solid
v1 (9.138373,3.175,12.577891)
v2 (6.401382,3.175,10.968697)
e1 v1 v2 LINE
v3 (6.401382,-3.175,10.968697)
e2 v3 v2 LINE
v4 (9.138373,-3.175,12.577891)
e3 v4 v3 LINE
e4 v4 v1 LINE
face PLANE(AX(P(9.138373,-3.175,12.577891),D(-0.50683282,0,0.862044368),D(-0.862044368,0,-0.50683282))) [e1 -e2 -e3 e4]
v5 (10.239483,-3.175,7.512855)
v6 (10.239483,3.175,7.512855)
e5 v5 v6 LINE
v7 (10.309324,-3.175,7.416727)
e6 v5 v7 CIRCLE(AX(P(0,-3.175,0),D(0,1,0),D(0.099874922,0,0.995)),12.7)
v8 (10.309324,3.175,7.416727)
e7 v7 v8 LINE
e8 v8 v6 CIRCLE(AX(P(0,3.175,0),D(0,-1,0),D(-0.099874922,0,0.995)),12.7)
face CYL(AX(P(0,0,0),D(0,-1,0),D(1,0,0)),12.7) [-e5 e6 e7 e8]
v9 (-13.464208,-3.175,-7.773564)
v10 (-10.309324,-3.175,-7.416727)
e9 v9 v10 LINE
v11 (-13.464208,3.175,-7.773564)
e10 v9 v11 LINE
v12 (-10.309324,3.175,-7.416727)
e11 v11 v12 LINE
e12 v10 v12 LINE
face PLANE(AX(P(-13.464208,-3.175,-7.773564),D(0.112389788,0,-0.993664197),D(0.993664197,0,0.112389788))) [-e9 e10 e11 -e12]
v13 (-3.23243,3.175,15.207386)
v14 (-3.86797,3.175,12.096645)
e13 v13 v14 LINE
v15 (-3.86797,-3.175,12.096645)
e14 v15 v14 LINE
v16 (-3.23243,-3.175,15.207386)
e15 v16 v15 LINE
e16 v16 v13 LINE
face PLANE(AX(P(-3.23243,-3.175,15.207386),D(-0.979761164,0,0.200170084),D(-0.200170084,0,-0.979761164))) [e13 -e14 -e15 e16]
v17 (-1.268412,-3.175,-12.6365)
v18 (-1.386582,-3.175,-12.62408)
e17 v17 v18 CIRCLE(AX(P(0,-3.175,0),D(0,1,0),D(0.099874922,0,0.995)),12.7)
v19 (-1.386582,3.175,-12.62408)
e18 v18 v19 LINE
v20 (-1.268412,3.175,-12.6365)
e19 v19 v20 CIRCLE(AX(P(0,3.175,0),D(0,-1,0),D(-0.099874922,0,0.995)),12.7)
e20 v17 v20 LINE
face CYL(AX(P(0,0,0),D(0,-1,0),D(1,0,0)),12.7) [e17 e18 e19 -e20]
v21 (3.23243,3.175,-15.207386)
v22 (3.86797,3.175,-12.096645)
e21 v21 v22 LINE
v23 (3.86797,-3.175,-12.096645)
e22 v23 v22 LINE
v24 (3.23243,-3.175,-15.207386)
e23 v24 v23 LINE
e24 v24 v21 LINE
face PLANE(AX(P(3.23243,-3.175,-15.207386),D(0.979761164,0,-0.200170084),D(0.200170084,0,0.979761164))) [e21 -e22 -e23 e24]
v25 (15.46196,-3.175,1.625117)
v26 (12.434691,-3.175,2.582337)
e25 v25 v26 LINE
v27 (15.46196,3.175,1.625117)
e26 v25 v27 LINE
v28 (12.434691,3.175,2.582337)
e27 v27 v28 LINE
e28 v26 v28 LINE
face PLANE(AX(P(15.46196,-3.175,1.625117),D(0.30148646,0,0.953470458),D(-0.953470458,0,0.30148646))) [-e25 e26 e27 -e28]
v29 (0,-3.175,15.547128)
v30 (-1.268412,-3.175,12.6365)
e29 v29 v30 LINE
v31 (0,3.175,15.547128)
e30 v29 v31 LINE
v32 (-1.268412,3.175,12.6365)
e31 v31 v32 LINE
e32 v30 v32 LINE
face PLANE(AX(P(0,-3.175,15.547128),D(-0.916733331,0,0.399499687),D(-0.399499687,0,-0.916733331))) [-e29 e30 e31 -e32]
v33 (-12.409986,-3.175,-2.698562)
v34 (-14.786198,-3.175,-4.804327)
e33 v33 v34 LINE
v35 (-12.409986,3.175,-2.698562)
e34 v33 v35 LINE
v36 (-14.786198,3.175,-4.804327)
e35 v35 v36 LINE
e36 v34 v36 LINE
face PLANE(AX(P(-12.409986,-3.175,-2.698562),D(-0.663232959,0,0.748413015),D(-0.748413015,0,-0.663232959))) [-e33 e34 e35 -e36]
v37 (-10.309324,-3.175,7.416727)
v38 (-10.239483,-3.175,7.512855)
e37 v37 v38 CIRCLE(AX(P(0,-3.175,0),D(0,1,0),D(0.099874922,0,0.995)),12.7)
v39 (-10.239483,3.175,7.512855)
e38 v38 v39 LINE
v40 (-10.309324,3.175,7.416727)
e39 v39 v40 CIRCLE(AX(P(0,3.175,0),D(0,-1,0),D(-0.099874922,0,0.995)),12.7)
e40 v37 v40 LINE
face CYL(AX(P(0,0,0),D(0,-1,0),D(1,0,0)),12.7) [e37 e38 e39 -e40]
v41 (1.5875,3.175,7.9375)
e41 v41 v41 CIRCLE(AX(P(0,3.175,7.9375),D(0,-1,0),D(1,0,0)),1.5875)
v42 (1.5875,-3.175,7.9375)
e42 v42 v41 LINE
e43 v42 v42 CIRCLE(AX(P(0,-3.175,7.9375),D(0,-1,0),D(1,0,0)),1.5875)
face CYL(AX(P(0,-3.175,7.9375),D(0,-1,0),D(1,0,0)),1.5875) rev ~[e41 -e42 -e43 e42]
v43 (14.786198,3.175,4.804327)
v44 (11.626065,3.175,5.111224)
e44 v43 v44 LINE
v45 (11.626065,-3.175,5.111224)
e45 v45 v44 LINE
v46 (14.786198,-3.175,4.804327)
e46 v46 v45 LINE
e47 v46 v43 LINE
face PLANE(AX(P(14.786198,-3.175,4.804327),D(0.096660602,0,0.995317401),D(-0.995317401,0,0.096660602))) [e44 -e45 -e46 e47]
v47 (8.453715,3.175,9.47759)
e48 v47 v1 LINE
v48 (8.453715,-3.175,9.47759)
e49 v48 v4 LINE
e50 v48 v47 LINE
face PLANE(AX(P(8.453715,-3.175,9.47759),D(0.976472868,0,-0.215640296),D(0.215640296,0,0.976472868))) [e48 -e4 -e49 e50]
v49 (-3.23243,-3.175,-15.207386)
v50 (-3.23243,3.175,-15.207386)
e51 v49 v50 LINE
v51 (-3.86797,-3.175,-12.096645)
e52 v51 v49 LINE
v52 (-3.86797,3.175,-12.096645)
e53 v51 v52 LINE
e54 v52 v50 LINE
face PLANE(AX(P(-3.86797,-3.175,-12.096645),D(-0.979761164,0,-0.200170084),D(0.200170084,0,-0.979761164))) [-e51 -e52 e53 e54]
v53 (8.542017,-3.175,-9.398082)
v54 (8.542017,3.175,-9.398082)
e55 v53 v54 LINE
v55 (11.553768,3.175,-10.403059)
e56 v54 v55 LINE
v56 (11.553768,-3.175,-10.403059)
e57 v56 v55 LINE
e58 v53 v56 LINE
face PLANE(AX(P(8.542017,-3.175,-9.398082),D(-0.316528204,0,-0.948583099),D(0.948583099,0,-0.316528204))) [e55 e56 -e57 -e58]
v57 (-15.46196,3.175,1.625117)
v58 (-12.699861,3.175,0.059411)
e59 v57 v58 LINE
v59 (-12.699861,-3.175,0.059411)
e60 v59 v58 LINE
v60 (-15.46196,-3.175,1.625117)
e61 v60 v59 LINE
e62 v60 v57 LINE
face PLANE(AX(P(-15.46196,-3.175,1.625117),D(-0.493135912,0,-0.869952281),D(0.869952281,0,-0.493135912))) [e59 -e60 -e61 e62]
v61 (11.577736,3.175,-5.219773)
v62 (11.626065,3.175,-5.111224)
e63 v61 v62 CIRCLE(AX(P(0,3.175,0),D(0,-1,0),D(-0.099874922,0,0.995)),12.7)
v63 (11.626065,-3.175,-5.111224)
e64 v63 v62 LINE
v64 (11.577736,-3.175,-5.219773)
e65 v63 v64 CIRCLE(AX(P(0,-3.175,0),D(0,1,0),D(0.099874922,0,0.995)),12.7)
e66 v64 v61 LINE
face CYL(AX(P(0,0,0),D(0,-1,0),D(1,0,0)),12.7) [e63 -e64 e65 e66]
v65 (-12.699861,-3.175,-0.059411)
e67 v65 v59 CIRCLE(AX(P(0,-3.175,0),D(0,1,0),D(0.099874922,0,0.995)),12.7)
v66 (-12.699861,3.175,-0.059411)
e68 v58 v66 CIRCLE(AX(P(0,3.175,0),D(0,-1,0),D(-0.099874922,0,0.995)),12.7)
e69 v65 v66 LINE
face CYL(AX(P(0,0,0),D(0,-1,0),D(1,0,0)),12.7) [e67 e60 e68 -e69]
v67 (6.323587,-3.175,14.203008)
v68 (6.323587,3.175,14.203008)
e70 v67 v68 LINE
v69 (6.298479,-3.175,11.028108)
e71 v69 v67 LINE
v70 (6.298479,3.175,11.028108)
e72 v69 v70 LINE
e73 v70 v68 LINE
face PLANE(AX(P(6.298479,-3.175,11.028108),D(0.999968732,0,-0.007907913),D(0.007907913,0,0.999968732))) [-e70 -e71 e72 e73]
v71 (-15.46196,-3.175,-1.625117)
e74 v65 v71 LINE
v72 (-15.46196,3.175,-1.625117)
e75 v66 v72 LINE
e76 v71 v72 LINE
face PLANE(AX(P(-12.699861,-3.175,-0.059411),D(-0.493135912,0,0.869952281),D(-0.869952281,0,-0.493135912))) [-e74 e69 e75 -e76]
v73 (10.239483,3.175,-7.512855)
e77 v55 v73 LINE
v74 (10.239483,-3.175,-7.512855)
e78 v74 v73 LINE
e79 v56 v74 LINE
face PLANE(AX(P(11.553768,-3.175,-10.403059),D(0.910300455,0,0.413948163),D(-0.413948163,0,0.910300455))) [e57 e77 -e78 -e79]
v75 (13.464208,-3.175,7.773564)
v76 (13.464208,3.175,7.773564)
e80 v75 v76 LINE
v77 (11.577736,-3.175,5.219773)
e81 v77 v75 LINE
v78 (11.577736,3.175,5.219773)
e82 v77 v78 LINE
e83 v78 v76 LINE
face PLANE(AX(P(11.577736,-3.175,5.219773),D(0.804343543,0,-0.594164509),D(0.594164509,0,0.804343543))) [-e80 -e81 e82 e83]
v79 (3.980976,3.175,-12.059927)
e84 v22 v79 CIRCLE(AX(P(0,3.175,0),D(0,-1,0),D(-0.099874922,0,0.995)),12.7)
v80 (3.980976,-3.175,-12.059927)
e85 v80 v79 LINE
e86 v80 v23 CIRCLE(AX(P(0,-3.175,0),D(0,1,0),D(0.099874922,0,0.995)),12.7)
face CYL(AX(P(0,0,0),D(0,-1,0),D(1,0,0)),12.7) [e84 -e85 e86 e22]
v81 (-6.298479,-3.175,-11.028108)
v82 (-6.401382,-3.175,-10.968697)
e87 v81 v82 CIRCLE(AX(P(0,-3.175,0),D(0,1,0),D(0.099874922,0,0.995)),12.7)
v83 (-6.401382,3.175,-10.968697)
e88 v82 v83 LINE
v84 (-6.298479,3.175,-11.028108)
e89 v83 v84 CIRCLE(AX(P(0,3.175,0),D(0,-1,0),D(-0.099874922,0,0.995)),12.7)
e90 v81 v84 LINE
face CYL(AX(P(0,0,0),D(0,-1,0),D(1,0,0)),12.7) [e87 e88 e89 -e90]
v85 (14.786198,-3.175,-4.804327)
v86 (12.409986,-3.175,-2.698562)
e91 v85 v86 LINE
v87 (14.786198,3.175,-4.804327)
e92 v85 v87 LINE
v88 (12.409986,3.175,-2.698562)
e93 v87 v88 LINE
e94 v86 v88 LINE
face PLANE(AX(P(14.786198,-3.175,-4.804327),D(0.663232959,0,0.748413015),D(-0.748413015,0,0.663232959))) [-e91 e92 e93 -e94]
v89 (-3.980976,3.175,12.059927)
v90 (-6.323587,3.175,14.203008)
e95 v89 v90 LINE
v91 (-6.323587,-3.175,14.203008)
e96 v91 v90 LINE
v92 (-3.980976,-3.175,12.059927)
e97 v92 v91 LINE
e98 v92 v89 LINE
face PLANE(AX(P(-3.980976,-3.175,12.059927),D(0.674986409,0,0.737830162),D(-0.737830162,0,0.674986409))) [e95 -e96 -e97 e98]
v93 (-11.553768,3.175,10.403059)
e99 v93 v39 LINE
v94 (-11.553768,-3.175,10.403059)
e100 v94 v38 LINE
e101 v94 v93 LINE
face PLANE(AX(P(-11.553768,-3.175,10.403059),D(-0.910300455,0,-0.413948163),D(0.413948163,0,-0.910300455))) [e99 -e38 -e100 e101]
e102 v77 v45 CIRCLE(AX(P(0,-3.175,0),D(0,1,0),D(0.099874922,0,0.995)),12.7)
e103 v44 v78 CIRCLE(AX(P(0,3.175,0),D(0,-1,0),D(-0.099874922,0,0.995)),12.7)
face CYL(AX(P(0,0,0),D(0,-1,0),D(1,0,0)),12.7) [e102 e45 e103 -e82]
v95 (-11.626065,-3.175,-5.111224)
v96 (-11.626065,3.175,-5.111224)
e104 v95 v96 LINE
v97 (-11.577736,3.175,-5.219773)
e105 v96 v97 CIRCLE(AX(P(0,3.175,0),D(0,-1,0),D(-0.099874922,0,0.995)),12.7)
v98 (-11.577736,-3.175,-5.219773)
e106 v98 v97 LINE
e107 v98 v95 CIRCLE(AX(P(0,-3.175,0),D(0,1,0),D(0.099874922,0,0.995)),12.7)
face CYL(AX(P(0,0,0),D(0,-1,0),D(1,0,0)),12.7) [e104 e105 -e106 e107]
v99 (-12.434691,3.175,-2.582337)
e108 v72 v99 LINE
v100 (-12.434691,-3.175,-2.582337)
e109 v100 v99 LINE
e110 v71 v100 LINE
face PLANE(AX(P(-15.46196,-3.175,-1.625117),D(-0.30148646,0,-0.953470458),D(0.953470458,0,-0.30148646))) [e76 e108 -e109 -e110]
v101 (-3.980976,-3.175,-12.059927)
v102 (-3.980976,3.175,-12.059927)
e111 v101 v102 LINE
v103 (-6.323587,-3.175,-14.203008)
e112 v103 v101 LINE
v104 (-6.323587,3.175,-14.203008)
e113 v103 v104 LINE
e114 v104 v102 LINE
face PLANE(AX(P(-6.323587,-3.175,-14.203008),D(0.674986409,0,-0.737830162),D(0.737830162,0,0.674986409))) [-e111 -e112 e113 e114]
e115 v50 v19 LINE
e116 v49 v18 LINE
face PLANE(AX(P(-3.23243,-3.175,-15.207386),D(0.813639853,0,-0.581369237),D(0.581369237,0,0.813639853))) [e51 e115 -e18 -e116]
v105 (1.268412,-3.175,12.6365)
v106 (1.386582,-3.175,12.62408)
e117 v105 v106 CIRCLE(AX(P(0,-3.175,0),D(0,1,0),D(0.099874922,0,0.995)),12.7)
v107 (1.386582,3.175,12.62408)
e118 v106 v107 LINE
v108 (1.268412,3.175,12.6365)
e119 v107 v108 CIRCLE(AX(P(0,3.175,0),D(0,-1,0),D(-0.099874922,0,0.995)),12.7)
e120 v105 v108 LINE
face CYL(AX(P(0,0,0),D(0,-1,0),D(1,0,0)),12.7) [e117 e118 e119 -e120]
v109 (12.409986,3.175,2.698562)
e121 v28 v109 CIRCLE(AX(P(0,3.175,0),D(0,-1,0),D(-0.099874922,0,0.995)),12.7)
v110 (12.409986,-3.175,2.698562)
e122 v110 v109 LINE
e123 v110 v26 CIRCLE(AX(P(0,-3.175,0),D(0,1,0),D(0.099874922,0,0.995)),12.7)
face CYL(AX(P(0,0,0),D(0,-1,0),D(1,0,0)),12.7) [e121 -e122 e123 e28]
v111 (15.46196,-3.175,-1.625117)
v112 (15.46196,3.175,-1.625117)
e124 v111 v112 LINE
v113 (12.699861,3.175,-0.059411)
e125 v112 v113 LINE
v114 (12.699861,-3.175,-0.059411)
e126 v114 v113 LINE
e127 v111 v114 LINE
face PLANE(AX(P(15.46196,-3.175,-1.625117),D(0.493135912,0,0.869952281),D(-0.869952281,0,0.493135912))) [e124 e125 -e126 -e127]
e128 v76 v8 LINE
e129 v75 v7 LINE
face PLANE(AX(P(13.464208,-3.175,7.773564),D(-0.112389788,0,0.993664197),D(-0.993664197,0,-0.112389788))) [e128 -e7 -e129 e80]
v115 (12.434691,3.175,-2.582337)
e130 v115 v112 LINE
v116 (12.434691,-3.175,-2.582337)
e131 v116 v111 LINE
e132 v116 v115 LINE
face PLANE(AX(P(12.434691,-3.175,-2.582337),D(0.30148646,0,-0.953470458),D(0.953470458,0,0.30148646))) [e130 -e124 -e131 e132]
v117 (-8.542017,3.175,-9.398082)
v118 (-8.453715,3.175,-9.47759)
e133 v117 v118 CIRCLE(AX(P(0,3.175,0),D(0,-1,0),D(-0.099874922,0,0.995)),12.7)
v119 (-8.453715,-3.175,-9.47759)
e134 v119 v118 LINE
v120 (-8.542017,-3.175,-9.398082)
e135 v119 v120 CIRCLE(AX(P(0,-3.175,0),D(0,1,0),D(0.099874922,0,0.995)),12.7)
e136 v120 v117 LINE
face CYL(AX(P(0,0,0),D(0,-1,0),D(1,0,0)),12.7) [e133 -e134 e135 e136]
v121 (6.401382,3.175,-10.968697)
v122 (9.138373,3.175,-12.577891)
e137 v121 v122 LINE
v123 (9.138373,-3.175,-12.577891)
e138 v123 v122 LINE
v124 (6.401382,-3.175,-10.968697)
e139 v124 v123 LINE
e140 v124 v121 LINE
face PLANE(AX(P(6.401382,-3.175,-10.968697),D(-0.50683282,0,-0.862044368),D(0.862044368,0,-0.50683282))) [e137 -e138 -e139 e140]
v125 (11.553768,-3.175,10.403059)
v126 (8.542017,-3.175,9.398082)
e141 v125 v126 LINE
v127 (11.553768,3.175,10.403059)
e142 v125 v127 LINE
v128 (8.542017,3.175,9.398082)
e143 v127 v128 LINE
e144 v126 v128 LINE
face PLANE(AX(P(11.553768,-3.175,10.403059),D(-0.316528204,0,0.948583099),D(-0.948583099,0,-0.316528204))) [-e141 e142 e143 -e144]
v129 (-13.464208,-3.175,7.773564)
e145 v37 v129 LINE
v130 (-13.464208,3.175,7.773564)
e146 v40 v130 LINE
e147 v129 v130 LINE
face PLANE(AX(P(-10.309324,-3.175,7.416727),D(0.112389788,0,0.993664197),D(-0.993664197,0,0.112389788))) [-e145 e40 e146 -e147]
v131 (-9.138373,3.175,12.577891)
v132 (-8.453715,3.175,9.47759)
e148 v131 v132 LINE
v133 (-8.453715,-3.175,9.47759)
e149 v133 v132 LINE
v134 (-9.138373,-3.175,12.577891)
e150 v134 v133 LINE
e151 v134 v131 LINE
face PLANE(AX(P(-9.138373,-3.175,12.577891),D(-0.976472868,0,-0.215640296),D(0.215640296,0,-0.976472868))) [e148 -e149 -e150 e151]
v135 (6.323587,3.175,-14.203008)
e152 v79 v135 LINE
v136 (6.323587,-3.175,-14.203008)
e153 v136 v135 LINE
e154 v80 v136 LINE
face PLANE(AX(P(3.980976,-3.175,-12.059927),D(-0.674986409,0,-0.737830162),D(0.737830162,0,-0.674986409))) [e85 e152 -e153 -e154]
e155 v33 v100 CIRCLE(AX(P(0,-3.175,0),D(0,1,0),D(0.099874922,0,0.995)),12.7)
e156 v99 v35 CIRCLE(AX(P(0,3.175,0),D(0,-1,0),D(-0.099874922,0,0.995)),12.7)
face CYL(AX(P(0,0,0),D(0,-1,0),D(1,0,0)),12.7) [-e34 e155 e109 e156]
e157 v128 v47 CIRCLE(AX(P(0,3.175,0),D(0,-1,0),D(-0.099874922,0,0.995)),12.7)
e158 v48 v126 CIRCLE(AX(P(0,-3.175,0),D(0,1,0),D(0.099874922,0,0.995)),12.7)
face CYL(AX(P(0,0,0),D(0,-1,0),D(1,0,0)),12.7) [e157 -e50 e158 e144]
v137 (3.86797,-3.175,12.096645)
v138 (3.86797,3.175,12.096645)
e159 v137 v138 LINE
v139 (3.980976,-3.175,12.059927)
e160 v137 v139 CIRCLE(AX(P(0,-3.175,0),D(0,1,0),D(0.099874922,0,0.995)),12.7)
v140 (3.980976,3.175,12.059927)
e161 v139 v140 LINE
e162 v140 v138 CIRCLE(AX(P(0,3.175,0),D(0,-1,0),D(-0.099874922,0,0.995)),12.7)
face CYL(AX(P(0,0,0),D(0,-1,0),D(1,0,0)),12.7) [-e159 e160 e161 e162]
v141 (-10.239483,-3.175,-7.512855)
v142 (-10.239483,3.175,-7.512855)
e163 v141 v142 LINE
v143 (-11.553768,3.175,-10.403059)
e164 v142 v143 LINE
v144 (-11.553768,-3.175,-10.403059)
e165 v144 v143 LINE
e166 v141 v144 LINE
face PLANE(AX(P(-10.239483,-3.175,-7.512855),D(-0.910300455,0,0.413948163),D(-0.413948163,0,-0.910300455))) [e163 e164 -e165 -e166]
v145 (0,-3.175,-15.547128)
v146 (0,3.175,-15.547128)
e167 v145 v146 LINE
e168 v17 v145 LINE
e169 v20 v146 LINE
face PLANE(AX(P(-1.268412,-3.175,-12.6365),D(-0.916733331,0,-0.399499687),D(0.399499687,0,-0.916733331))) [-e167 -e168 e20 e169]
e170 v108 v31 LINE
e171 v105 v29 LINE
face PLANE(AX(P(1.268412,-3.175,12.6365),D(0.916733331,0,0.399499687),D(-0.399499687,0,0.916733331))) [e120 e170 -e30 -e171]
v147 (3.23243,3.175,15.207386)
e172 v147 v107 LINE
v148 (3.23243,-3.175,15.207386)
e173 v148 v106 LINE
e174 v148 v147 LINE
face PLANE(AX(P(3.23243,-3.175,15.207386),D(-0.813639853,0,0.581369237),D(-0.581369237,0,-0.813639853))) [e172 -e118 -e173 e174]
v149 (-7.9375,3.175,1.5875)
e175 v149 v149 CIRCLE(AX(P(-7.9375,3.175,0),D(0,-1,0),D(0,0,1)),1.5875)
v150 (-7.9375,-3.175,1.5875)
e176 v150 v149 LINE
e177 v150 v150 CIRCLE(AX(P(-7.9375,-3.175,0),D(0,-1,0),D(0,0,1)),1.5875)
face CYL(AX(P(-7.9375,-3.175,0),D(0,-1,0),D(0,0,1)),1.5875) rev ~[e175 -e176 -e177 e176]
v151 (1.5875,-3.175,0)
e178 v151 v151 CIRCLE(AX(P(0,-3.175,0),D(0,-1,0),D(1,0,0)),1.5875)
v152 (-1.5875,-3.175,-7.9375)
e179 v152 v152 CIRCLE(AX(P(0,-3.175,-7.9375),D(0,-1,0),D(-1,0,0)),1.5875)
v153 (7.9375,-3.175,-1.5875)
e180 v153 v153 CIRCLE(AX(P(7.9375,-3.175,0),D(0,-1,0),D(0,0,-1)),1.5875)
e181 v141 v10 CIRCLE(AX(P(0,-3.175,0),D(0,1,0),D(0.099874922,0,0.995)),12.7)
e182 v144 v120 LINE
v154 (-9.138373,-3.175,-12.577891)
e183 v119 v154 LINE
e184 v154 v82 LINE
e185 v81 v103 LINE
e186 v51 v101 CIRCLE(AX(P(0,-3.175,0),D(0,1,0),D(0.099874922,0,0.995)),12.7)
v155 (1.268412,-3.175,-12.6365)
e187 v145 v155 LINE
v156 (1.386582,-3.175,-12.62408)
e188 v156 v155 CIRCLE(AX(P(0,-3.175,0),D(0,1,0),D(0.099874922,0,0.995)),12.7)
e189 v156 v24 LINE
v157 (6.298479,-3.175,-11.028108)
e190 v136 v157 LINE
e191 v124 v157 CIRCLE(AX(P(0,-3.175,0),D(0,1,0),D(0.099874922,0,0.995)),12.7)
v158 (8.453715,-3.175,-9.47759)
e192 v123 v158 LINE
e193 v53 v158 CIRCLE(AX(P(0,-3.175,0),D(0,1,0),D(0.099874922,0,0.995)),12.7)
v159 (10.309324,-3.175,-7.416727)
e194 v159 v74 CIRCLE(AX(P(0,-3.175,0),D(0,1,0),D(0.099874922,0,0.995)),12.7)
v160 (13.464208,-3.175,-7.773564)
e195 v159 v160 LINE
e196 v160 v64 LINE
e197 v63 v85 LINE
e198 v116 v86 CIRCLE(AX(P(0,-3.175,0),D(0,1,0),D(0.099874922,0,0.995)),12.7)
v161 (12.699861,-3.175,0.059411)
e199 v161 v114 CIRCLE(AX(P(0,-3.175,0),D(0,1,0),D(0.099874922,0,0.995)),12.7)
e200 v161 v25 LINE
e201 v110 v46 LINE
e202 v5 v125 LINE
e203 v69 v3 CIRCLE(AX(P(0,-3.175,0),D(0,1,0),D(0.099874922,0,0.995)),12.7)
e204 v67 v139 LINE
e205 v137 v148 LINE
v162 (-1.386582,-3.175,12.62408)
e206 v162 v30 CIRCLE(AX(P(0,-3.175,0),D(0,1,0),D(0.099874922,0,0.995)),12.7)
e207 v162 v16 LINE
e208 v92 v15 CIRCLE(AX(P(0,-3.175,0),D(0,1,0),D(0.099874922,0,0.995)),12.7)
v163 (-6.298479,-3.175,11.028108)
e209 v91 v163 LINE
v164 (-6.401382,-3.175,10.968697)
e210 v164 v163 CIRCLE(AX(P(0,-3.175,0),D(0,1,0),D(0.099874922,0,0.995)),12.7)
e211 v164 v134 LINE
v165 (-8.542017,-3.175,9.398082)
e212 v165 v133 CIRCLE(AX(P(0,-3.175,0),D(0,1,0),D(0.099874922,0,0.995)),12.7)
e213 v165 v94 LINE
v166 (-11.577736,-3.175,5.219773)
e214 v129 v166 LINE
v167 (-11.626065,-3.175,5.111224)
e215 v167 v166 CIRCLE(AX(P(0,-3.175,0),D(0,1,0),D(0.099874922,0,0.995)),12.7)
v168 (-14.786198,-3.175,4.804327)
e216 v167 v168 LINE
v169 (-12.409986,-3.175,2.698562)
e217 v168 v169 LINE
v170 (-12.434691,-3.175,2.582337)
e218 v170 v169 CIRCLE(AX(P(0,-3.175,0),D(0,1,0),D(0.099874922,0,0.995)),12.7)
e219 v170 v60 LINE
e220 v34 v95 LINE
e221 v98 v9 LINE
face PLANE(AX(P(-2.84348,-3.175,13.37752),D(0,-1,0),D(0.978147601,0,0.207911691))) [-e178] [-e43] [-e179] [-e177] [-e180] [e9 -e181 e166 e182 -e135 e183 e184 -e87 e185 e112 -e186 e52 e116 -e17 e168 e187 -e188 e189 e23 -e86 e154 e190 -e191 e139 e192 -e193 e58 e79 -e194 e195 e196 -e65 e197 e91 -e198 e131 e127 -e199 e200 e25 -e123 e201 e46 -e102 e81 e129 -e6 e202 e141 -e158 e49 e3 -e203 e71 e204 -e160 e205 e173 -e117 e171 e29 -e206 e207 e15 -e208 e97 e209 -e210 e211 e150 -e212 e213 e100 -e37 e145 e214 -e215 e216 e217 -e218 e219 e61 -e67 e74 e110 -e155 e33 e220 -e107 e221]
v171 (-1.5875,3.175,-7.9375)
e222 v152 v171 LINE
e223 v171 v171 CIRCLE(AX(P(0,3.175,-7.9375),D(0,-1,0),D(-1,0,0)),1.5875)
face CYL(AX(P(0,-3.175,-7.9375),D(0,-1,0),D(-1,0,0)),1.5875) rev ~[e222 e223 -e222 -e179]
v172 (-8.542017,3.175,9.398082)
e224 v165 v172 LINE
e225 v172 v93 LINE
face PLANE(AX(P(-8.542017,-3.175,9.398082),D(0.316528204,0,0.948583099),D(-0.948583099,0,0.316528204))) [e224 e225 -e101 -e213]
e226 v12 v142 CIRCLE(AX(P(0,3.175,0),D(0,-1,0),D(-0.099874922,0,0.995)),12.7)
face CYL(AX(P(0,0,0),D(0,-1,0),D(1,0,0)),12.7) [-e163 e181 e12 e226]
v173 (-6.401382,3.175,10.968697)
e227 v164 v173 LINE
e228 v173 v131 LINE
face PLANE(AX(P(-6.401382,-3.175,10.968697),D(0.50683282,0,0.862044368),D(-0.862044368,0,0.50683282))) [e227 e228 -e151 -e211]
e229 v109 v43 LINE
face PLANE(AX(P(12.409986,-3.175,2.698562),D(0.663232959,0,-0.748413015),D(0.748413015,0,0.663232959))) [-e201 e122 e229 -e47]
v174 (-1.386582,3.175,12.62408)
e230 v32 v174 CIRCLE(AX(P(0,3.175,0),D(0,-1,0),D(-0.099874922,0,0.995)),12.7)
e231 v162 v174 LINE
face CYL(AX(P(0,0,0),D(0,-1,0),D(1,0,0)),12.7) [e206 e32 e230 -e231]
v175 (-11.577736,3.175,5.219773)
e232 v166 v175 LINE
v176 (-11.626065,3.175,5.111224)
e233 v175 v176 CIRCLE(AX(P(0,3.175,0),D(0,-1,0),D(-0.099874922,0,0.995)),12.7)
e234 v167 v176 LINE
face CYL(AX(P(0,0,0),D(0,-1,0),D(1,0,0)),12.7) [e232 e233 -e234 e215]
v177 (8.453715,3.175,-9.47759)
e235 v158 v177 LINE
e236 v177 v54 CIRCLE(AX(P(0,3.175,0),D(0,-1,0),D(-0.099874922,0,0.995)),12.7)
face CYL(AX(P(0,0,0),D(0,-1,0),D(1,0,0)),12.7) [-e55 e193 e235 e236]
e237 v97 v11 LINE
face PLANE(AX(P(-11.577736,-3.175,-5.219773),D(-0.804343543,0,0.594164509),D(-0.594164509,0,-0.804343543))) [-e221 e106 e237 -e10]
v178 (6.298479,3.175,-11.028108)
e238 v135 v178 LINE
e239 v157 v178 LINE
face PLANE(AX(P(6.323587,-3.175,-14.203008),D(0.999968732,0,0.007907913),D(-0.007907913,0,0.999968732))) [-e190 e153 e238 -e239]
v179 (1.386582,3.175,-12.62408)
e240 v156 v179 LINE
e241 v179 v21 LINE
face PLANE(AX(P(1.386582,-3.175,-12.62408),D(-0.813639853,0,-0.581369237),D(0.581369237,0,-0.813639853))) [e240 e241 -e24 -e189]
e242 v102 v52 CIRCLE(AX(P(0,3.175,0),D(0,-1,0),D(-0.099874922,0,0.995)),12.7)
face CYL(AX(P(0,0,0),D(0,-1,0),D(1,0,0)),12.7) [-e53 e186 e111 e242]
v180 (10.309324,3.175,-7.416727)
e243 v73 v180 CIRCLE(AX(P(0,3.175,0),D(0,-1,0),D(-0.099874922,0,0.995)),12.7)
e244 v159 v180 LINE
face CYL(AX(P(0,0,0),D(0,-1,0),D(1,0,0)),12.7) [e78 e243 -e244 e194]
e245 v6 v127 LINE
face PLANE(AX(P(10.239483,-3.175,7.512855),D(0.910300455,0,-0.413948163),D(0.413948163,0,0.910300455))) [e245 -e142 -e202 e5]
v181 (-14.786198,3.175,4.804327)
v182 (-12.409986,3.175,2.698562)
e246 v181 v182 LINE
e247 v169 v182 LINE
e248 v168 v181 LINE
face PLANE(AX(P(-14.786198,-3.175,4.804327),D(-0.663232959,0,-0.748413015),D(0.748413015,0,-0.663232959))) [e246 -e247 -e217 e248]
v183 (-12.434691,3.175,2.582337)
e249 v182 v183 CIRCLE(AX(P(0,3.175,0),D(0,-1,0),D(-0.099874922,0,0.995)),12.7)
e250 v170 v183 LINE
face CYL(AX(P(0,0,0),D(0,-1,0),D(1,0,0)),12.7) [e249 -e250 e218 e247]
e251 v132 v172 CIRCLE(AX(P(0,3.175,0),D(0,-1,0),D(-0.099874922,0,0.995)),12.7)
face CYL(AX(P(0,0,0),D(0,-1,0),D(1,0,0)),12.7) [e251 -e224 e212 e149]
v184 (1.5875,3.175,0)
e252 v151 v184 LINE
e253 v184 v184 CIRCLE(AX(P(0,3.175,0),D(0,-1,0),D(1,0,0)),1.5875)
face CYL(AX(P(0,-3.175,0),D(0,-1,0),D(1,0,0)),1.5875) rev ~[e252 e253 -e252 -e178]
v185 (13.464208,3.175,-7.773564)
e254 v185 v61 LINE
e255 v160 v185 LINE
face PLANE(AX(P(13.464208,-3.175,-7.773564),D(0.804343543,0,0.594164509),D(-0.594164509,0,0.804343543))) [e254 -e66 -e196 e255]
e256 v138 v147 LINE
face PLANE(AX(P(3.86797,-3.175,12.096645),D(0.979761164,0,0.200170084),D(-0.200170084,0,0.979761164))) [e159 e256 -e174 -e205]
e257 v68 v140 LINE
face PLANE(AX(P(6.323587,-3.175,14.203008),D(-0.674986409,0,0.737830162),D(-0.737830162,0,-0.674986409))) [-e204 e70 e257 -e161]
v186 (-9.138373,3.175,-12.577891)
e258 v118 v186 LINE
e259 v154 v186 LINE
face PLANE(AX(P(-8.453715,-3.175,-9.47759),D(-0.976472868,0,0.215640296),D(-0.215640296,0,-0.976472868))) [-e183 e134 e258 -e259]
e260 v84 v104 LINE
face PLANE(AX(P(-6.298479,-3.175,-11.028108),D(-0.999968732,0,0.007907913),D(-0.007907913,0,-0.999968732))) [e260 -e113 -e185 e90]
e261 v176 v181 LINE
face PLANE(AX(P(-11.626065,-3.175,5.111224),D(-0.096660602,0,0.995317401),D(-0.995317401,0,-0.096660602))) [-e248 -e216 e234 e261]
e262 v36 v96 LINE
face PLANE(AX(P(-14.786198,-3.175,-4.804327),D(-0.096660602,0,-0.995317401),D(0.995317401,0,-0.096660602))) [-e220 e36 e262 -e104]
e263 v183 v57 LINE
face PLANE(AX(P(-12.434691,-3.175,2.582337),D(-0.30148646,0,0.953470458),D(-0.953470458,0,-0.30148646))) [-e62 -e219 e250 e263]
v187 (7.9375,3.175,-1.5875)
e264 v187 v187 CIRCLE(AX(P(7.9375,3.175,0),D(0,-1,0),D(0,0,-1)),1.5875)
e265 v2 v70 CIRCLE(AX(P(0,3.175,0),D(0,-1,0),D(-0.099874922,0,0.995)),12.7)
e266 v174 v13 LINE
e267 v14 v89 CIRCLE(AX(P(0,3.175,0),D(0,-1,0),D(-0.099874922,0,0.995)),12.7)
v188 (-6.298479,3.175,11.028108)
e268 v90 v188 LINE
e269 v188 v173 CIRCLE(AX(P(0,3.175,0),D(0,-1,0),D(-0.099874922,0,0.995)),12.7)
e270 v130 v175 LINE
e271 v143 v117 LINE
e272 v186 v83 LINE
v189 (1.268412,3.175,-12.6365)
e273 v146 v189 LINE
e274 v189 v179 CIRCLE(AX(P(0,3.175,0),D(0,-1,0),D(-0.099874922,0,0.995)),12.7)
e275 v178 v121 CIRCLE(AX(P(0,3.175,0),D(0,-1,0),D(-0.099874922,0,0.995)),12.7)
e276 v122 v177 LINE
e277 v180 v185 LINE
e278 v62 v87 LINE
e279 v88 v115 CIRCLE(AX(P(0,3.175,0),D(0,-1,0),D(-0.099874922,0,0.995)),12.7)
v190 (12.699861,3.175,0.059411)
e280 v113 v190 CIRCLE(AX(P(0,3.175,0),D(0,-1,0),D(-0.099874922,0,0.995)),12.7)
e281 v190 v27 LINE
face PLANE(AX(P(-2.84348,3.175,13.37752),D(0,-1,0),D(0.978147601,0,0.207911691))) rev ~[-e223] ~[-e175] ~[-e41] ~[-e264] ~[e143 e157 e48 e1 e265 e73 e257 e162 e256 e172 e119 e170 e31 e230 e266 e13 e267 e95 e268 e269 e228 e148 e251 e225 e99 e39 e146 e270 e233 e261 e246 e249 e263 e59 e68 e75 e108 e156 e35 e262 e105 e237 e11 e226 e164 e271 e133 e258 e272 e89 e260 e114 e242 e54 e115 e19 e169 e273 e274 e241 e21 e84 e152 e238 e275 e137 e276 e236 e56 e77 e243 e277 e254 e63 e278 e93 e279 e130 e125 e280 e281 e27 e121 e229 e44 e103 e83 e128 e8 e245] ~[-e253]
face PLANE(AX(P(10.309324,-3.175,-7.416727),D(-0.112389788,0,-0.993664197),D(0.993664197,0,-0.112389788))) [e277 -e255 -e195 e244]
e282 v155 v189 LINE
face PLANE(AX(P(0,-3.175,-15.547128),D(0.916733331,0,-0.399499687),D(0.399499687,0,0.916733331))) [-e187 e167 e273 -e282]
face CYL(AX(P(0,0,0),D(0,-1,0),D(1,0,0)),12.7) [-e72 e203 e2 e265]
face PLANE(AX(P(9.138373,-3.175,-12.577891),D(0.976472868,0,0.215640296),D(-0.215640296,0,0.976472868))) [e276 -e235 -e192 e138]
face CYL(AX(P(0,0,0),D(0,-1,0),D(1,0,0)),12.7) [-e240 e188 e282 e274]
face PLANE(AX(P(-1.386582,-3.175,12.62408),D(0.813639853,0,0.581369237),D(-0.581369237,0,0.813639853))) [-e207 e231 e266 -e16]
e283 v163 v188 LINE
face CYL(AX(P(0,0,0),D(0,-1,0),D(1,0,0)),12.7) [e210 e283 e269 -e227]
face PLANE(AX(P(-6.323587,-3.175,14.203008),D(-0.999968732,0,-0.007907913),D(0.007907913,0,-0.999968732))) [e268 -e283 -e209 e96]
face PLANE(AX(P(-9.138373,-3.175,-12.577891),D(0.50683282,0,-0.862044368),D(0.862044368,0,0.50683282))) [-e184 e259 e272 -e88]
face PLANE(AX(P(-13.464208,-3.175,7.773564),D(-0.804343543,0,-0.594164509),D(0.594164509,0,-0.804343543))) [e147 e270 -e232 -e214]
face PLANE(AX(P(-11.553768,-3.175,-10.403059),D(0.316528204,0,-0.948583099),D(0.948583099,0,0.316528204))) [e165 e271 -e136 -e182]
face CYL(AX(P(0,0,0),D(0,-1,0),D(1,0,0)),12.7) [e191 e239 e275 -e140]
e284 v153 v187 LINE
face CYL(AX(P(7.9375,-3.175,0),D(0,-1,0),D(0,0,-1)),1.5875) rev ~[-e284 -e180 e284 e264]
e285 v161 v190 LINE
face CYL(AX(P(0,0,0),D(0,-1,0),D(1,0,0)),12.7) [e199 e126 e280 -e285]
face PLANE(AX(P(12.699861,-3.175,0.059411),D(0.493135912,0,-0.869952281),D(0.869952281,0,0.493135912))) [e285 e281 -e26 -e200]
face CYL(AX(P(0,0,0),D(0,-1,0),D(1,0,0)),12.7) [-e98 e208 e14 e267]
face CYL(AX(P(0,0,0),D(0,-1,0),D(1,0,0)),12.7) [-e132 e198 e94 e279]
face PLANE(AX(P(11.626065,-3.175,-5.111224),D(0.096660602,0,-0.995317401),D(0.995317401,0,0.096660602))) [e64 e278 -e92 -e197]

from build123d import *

# Parameters (mm, degrees)
F0_R            = 12.7
F1_DEPTH        = 3.175
F3_DEPTH        = 6.35
F3_COPIES_COUNT = 30
F4_R            = 1.5875
F5_DEPTH        = 6.35
F6_R            = 1.5875
F7_DEPTH        = 6.35
F7_COPIES_COUNT = 4


# Not quite as in the source:
# - a pattern or mirror of a feature is missing from the dataset's text; its kind, count and spacing are read off the source's solid
# - a feature names something its author has since deleted; it is built from what else it names


with BuildPart() as f1:
    # F0 (on Front) → F1 (new body, symmetric)
    with BuildSketch(Plane.XZ):
        Circle(F0_R)
    extrude(amount=F1_DEPTH, both=True)

    # F2 (on face) → F3 (join)
    with BuildSketch(Plane.XZ.offset(3.175)):
        Polygon((0, 15.5471283256), (-1.2684115066, 12.6365), (1.2684115066, 12.6365), align=None)
    f3 = extrude(amount=-F3_DEPTH)

    # F3_copies: F3 ×30 about axis
    f3_copies_axis = Axis((0, 0, 0), (0, 1, 0))
    for i in range(1, F3_COPIES_COUNT):
        add(f3.rotate(f3_copies_axis, i * 360 / F3_COPIES_COUNT))

    # F4 (on face) → F5 (cut)
    with BuildSketch(Plane.XZ.offset(3.175)):
        Circle(F4_R)
    extrude(amount=-F5_DEPTH, mode=Mode.SUBTRACT)

    # F6 (on face) → F7 (cut)
    with BuildSketch(Plane.XZ.offset(3.175)):
        with Locations((0, 7.9375)):
            Circle(F6_R)
    f7 = extrude(amount=-F7_DEPTH, mode=Mode.SUBTRACT)

    # F7_copies: F7 ×4 about axis
    f7_copies_axis = Axis((0, 0, 0), (0, 1, 0))
    for i in range(1, F7_COPIES_COUNT):
        add(f7.rotate(f7_copies_axis, i * 360 / F7_COPIES_COUNT), mode=Mode.SUBTRACT)


solid = f1.part
